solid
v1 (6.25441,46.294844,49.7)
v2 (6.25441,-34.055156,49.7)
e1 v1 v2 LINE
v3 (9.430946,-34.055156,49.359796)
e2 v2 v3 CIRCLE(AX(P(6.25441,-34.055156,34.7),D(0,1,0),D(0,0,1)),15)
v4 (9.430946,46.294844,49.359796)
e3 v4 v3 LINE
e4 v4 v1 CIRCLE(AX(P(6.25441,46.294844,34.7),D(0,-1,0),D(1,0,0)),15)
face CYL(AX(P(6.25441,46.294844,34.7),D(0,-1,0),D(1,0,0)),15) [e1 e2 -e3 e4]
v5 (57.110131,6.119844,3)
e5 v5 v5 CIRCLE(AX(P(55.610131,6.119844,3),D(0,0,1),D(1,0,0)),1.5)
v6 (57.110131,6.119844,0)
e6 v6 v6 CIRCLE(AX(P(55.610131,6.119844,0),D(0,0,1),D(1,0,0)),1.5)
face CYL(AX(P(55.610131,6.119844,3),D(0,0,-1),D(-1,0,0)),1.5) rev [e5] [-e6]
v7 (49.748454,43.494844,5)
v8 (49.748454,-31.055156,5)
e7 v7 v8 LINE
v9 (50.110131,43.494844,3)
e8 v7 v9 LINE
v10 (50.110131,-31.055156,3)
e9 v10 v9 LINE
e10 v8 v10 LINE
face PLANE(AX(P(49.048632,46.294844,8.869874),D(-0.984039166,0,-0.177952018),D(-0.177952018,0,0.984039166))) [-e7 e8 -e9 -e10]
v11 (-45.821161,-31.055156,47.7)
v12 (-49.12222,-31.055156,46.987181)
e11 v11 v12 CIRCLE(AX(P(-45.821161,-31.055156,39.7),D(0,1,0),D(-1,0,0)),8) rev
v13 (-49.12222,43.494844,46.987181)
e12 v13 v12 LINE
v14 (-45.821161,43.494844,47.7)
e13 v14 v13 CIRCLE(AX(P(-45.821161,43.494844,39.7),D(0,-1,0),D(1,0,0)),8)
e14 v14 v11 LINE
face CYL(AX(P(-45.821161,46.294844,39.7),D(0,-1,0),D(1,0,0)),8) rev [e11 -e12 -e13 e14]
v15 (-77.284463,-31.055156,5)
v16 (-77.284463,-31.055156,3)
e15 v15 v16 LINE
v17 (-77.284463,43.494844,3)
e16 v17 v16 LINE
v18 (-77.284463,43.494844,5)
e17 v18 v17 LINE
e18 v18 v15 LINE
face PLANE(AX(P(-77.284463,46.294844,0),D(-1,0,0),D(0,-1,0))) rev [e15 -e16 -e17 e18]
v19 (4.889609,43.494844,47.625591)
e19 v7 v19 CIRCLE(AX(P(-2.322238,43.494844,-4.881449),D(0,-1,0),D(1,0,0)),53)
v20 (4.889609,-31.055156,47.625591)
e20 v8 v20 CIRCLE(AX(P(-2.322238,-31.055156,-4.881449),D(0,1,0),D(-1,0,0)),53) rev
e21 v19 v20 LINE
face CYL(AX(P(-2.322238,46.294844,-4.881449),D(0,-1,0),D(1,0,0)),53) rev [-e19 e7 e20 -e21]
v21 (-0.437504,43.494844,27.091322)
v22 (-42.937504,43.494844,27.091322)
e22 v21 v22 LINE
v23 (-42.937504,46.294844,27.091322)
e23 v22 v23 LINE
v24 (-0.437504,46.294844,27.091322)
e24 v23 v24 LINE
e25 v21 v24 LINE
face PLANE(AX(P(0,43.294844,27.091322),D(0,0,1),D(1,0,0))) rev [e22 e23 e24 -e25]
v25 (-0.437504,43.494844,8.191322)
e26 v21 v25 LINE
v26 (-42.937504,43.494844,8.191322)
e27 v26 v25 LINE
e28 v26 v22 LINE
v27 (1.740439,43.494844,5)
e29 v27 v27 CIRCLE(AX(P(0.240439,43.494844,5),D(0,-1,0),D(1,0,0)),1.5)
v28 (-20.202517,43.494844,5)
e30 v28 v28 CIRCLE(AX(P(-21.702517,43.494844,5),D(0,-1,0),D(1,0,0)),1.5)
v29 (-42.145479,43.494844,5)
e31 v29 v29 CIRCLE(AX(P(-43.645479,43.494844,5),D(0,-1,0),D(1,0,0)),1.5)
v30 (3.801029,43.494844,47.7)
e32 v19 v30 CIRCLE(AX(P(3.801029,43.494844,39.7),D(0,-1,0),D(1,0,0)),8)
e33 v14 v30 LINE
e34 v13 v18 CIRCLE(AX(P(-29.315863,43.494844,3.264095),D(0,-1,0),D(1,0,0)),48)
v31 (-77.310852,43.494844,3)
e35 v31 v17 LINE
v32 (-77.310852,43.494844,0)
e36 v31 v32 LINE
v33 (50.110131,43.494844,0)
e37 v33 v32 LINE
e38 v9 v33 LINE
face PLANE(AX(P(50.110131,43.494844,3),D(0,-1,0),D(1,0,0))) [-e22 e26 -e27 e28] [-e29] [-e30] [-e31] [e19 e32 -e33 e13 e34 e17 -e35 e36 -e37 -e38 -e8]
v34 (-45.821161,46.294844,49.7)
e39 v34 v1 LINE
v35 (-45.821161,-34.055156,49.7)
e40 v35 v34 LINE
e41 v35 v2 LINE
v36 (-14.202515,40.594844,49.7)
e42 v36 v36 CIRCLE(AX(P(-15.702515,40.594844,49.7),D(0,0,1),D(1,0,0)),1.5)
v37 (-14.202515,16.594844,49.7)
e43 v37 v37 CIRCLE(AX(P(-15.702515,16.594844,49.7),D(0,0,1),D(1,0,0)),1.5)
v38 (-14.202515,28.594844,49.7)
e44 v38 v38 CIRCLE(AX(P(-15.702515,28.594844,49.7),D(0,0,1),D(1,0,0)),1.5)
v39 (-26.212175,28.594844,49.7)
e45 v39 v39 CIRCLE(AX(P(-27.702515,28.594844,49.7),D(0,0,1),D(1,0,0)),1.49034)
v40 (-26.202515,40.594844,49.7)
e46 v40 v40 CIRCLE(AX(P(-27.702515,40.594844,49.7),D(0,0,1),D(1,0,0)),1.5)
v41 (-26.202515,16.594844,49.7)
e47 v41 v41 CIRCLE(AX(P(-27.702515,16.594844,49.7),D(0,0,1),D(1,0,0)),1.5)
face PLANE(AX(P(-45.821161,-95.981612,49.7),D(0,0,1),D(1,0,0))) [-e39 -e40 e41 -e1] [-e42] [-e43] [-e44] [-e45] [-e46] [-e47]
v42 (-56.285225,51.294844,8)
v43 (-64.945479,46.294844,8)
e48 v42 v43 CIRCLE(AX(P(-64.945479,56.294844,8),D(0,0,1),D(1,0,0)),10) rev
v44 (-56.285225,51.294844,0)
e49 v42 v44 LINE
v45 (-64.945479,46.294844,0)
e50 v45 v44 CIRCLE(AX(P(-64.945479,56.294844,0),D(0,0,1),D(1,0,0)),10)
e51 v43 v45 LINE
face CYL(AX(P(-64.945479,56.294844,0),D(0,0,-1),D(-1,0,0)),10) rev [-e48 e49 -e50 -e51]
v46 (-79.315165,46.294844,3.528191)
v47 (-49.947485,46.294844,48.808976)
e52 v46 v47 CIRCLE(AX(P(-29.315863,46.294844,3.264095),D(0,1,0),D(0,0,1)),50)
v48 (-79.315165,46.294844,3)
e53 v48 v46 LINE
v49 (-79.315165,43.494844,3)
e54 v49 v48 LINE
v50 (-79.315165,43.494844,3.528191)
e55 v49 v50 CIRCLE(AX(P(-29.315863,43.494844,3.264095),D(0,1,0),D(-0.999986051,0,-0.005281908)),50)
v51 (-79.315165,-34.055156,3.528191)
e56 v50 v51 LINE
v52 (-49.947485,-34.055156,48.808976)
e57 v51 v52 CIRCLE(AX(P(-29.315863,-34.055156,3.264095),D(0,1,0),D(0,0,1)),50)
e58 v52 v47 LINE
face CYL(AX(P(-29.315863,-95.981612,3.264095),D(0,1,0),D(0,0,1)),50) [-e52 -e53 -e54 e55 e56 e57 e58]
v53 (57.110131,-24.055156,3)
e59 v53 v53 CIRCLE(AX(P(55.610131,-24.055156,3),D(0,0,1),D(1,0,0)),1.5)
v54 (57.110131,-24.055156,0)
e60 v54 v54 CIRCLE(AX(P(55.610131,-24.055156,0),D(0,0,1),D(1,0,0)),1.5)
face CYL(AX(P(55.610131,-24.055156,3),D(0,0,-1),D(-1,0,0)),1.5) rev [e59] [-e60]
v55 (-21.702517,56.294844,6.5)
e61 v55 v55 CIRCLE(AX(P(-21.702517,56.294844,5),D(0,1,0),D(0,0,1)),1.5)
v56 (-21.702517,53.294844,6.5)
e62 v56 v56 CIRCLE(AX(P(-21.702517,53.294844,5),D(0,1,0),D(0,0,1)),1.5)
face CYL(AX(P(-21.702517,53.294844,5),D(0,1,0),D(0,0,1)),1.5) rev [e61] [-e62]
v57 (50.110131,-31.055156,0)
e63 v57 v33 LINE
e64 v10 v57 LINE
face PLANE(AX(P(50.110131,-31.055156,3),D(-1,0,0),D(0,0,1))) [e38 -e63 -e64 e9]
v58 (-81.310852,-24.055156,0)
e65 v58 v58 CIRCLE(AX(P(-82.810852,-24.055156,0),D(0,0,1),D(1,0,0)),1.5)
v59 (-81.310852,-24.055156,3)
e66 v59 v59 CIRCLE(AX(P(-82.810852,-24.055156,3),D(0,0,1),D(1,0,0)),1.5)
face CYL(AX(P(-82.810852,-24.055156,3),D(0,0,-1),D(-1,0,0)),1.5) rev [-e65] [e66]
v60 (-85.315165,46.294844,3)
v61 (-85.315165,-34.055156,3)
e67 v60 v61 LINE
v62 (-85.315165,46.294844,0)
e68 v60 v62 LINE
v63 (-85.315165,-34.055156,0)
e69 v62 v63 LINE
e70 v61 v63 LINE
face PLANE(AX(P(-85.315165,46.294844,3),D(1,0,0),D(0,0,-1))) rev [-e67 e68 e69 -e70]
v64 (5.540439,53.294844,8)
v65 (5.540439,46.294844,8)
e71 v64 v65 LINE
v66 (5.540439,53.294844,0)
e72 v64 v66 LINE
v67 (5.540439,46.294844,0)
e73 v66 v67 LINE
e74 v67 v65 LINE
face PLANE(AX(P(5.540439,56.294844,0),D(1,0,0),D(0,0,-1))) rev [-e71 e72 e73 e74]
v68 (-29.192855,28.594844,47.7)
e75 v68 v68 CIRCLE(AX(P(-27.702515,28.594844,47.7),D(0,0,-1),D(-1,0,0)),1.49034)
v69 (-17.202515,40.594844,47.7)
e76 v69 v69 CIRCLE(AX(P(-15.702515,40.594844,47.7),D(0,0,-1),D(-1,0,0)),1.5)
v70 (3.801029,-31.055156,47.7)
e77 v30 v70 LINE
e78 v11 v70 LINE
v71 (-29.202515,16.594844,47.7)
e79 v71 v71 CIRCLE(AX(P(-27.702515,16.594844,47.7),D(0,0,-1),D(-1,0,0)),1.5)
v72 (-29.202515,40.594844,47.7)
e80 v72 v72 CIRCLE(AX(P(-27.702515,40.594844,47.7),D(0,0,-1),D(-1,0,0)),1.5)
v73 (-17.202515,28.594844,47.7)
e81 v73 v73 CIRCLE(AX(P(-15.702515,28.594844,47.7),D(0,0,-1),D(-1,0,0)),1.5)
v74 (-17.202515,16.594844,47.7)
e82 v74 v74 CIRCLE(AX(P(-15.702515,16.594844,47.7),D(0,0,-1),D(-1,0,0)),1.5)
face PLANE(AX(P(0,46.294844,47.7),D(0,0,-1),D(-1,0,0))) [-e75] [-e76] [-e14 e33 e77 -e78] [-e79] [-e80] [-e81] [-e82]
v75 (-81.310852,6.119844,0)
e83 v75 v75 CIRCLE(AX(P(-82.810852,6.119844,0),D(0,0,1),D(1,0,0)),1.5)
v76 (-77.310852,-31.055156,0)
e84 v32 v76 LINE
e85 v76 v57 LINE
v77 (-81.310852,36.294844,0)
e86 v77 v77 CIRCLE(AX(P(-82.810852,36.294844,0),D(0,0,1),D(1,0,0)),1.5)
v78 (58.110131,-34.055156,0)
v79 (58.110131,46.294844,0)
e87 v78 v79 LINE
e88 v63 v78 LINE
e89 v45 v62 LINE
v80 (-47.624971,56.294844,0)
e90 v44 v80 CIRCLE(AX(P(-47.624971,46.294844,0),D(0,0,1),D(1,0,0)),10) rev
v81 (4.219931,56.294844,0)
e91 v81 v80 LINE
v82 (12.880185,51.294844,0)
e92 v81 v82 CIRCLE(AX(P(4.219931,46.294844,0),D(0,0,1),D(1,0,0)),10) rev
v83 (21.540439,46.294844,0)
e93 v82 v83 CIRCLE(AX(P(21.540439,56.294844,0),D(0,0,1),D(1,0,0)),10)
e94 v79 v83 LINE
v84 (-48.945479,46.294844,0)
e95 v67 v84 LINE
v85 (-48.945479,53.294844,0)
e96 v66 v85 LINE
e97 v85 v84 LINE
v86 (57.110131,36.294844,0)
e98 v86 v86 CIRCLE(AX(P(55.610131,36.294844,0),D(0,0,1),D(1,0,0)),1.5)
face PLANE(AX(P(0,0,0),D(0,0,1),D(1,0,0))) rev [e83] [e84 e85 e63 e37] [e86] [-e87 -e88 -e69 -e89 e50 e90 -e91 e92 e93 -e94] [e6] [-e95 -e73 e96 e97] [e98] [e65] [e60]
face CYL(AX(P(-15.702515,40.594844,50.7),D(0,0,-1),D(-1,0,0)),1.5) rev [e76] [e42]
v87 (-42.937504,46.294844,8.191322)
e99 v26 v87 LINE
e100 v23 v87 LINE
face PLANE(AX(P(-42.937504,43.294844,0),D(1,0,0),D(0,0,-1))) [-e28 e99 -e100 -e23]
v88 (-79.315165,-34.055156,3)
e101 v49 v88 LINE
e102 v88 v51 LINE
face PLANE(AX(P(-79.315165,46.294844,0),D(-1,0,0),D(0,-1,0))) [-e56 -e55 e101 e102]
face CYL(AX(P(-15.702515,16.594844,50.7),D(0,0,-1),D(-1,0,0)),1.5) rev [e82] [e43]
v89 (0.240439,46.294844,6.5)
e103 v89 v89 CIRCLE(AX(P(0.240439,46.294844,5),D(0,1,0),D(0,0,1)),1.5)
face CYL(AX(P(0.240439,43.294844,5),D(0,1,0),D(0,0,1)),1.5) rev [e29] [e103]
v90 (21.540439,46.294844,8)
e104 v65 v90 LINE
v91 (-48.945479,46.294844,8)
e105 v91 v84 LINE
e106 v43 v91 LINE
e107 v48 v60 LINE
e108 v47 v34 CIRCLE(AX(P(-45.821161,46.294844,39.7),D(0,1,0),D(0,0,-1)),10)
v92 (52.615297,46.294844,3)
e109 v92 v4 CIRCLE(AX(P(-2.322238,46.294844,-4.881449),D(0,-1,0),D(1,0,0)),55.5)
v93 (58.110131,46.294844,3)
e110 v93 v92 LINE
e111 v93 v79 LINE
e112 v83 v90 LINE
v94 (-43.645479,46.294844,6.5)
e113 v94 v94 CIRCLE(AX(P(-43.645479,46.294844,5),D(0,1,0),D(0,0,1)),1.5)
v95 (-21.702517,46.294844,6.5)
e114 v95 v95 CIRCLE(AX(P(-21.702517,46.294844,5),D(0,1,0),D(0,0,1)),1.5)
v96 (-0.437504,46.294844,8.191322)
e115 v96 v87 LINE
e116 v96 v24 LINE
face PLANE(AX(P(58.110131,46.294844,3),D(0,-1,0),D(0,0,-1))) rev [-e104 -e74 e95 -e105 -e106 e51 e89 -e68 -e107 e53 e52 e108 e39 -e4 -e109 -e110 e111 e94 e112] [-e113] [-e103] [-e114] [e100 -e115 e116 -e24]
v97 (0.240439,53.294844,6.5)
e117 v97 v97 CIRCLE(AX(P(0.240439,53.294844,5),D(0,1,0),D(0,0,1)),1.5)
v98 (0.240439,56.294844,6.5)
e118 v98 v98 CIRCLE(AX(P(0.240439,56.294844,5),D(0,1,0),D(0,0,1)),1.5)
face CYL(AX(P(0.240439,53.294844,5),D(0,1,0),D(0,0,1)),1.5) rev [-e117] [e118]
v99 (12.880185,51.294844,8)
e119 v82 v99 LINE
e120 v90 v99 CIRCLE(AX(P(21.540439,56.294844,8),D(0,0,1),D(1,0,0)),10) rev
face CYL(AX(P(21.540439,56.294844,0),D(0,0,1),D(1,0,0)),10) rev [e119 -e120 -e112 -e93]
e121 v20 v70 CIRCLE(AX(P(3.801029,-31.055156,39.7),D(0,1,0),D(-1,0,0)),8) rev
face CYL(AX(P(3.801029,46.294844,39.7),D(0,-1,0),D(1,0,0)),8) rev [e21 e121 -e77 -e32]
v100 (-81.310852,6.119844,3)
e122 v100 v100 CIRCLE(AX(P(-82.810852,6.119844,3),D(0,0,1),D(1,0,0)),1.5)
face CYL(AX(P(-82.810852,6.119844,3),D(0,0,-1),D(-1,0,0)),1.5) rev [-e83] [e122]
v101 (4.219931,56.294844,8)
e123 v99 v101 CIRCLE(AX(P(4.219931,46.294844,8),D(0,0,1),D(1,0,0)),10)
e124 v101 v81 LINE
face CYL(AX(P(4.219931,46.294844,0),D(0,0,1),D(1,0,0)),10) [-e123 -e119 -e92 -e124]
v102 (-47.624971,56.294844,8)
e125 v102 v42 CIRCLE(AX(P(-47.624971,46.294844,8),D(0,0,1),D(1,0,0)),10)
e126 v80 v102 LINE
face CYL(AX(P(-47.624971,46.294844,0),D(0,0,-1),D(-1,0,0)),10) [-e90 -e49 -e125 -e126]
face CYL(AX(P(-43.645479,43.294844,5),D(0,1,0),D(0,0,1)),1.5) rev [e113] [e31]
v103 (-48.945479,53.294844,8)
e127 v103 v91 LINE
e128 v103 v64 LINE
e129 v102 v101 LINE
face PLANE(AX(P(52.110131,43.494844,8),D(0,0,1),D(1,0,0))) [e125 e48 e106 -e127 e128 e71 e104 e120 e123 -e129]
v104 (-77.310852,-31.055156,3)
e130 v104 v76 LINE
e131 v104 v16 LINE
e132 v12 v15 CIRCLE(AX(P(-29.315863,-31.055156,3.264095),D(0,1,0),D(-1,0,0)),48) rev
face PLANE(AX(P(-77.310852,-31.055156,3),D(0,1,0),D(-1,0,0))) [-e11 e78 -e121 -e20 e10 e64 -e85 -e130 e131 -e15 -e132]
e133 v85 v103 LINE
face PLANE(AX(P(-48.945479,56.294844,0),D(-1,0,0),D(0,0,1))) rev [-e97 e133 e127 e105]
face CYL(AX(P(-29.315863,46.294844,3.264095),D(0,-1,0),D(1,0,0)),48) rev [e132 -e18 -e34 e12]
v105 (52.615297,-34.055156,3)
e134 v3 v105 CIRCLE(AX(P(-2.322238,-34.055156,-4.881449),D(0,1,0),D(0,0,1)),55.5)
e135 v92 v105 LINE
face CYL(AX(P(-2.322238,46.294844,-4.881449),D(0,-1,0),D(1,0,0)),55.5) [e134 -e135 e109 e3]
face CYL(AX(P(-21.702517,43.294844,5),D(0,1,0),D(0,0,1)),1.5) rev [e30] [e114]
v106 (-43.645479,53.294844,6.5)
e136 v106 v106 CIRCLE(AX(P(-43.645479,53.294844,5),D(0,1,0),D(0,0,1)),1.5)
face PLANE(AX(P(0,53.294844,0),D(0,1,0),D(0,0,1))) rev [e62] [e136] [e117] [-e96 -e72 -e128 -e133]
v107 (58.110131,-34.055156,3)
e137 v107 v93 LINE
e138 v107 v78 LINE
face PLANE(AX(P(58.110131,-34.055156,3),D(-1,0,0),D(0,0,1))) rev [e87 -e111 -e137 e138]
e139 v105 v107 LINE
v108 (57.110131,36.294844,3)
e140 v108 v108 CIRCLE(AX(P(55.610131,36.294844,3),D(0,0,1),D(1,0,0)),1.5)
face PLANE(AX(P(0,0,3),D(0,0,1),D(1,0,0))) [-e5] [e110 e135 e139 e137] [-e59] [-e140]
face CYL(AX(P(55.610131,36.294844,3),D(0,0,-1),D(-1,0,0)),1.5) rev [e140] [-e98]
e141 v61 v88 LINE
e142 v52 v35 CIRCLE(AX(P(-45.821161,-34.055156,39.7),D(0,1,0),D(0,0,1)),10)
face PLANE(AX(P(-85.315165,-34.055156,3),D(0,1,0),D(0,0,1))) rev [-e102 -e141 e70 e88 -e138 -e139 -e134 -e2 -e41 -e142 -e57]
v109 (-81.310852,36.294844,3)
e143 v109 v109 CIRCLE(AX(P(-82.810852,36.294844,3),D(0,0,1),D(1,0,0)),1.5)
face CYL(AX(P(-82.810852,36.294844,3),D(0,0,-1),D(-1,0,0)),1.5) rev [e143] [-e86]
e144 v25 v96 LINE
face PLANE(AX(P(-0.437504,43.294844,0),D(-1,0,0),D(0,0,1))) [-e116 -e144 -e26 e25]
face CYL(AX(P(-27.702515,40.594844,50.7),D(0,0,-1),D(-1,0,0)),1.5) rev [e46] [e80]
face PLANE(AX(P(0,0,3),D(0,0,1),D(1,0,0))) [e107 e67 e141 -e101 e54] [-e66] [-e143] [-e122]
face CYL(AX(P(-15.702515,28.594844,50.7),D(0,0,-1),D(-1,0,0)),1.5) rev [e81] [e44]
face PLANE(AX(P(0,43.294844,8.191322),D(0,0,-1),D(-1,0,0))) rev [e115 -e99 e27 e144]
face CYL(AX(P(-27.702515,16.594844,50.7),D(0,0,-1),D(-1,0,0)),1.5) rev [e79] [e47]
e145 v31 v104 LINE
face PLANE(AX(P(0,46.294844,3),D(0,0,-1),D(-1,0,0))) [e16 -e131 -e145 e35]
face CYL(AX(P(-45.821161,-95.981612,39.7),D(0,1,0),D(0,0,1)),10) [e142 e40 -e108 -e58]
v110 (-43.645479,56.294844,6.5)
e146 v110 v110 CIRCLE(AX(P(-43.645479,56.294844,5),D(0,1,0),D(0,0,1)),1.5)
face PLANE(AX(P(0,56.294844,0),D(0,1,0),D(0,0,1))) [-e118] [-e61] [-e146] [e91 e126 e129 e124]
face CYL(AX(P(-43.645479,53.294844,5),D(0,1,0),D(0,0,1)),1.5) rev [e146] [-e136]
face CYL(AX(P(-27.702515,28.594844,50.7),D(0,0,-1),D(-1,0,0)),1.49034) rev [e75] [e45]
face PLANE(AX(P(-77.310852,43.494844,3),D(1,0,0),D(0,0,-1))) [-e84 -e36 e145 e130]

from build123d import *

# Parameters (mm, degrees)
SKETCH_1_W                  = 143.42529591
SKETCH_1_H                  = 80.35
SKETCH_1_R                  = 1.5
SKETCH_1_W_2                = 127.420983087
SKETCH_1_H_2                = 74.55
EXTRUDE_1_DEPTH             = 3
SKETCH_2_W                  = 131.42529591
SKETCH_2_H                  = 5
SKETCH_2_R                  = 1.5
EXTRUDE_2_DEPTH             = 2.8
SKETCH_3_R                  = 1.5
CUT_EXTRUDE_1_DEPTH         = 10
SKETCH_4_W                  = 6
SKETCH_4_H                  = 8
EXTRUDE_3_DEPTH             = 10
SKETCH_5_W                  = 54.485918212
SKETCH_5_H                  = 8
EXTRUDE_4_DEPTH             = 3
FILLET_1_R                  = 10
FILLET_2_R                  = 10
SKETCH_6_R                  = 1.5
CUT_EXTRUDE_2_DEPTH         = 3
EXTRUDE_5_DEPTH             = 2.8
SKETCH_8_W                  = 42.5
SKETCH_8_H                  = 8
SKETCH_8_H_2                = 10.9
SKETCH_8_R                  = 1.5
CUT_EXTRUDE_3_DEPTH         = 3
EXTRUDE_6_REACH             = 127.55
EXTRUDE_6_DIRECTION_2_DEPTH = 2.8
SKETCH_11_R                 = 1.5
SKETCH_11_R_2               = 1.490339558
CUT_EXTRUDE_4_DEPTH         = 3
EXTRUDE_START               = -3
EXTRUDE_7_DEPTH             = 3


with BuildPart() as part:
    # 草图1 → 凸台-拉伸1 (new body)
    with BuildSketch(Plane.XY):
        with Locations((-13.602517363, 6.11984421)):
            Rectangle(SKETCH_1_W, SKETCH_1_H)
        with Locations((55.610130592, -24.05515579)):
            Circle(SKETCH_1_R, mode=Mode.SUBTRACT)
        with Locations((55.610130592, 6.11984421)):
            Circle(SKETCH_1_R, mode=Mode.SUBTRACT)
        with Locations((55.610130592, 36.29484421)):
            Circle(SKETCH_1_R, mode=Mode.SUBTRACT)
        with Locations((-82.810852495, -24.05515579)):
            Circle(SKETCH_1_R, mode=Mode.SUBTRACT)
        with Locations((-82.810852495, 6.11984421)):
            Circle(SKETCH_1_R, mode=Mode.SUBTRACT)
        with Locations((-82.810852495, 36.29484421)):
            Circle(SKETCH_1_R, mode=Mode.SUBTRACT)
        with Locations((-13.600360952, 6.21984421)):
            Rectangle(SKETCH_1_W_2, SKETCH_1_H_2, mode=Mode.SUBTRACT)
    extrude(amount=EXTRUDE_1_DEPTH)

    # 草图2 → 凸台-拉伸2 (add)
    with BuildSketch(Plane(origin=(0, 46.29484421, 0), x_dir=(1, 0, 0), z_dir=(0, 1, 0))):
        with Locations((-13.602517363, -5.5)):
            Rectangle(SKETCH_2_W, SKETCH_2_H)
        with Locations(Location((-21.702517363, -5, 0), (0, 0, 180))):
            Circle(SKETCH_2_R, mode=Mode.SUBTRACT)
    extrude(amount=-EXTRUDE_2_DEPTH)

    # 草图3 → 切除-拉伸1 (cut)
    with BuildSketch(Plane(origin=(0, 46.29484421, 0), x_dir=(1, 0, 0), z_dir=(0, 1, 0))):
        with Locations(Location((0.240439338, -5, 0), (0, 0, 270))):
            Circle(SKETCH_3_R)
        with Locations(Location((-43.645478874, -5, 0), (0, 0, 270))):
            Circle(SKETCH_3_R)
    extrude(amount=-CUT_EXTRUDE_1_DEPTH, mode=Mode.SUBTRACT)

    # 草图4 → 凸台-拉伸3 (add)
    with BuildSketch(Plane(origin=(0, 46.29484421, 0), x_dir=(1, 0, 0), z_dir=(0, 1, 0))):
        with Locations((8.540439338, -4)):
            Rectangle(SKETCH_4_W, SKETCH_4_H)
        with Locations((-51.945478874, -4)):
            Rectangle(SKETCH_4_W, SKETCH_4_H)
    extrude(amount=EXTRUDE_3_DEPTH)

    # 草图5 → 凸台-拉伸4 (add)
    with BuildSketch(Plane(origin=(0, 56.29484421, 0), x_dir=(1, 0, 0), z_dir=(0, 1, 0))):
        with Locations((-21.702519768, -4)):
            Rectangle(SKETCH_5_W, SKETCH_5_H)
    extrude(amount=-EXTRUDE_4_DEPTH)

    # 圆角1
    fillet_1_edges = [part.edges().sort_by_distance(p)[0] for p in [
        (11.540439338, 46.29484421, 4),
        (-54.945478874, 46.29484421, 4),
    ]]
    fillet(fillet_1_edges, radius=FILLET_1_R - 0.0001)  # a hair under: the kernel refuses the full size

    # 圆角2
    fillet_2_edges = [part.edges().sort_by_distance(p)[0] for p in [
        (-54.945478874, 56.29484421, 4),
        (11.540439338, 56.29484421, 4),
    ]]
    fillet(fillet_2_edges, radius=FILLET_2_R)

    # 草图6 → 切除-拉伸2 (cut)
    with BuildSketch(Plane(origin=(0, 56.29484421, 0), x_dir=(1, 0, 0), z_dir=(0, 1, 0))):
        with Locations(Location((0.240439338, -5, 0), (0, 0, 270))):
            Circle(SKETCH_6_R)
        with Locations(Location((-21.702517363, -5, 0), (0, 0, 180))):
            Circle(SKETCH_6_R)
        with Locations(Location((-43.645478874, -5, 0), (0, 0, 270))):
            Circle(SKETCH_6_R)
    extrude(amount=-CUT_EXTRUDE_2_DEPTH, mode=Mode.SUBTRACT)

    # 草图7 → 凸台-拉伸5 (add)
    with BuildSketch(Plane(origin=(0, 46.29484421, 0), x_dir=(1, 0, 0), z_dir=(0, 1, 0))):
        with BuildLine():
            Line((52.110130592, -3), (-79.315165318, -3))
            ThreePointArc((-79.315165318, -3), (-71.408587337, -30.249323597), (-49.947485102, -48.808976146))
            ThreePointArc((-49.947485102, -48.808976146), (-47.931875984, -49.474706171), (-45.821160639, -49.7))
            Line((-45.821160639, -49.7), (3.801028521, -49.7))
            ThreePointArc((3.801028521, -49.7), (4.482979053, -49.676720076), (5.161754433, -49.606988694))
            ThreePointArc((5.161754433, -49.606988694), (36.42646247, -34.151078405), (52.110130592, -3))
        make_face()
    extrude(amount=-EXTRUDE_5_DEPTH)

    # 草图8 → 切除-拉伸3 (cut)
    with BuildSketch(Plane(origin=(0, 46.29484421, 0), x_dir=(1, 0, 0), z_dir=(0, 1, 0))):
        with BuildLine():
            Line((52.110130592, -8), (52.110130592, -3))
            ThreePointArc((52.110130592, -3), (51.686965751, -5.511139637), (51.148017839, -8))
            Line((51.148017839, -8), (52.110130592, -8))
        make_face()
        with BuildLine():
            ThreePointArc((-79.091069545, -8), (-79.253197971, -5.766605102), (-79.315165318, -3.528190833))
            Line((-79.315165318, -3.528190833), (-79.315165318, -8))
            Line((-79.315165318, -8), (-79.091069545, -8))
        make_face()
        with BuildLine():
            Line((-79.315165318, -3.528190833), (-79.315165318, -3))
            ThreePointArc((-79.315165318, -3), (-79.315862787, -3.264095416), (-79.315165318, -3.528190833))
        make_face()
        with Locations((-21.687503936, -23.091321672)):
            Rectangle(SKETCH_8_W, SKETCH_8_H)
        with Locations((-21.687503936, -13.641321672)):
            Rectangle(SKETCH_8_W, SKETCH_8_H_2)
        with Locations(Location((0.240439338, -5, 0), (0, 0, 270))):
            Circle(SKETCH_8_R)
        with Locations(Location((-43.645478874, -5, 0), (0, 0, 270))):
            Circle(SKETCH_8_R)
        with Locations(Location((-21.702517363, -5, 0), (0, 0, 270))):
            Circle(SKETCH_8_R)
    extrude(amount=-CUT_EXTRUDE_3_DEPTH, mode=Mode.SUBTRACT)

    # 凸台-拉伸6: up to this face of the body (flat: up to its plane)
    extrude_6_end = Plane(part.part.faces().sort_by_distance((-13.602517363, -34.05515579, 1.5))[0])
    # 草图9 → 凸台-拉伸6 (add, up to the picked face)
    with BuildSketch(Plane.XZ.offset(-43.49484421), mode=Mode.PRIVATE) as extrude_6_sk1:
        with BuildLine():
            ThreePointArc((-45.821160639, 49.7), (-47.931875984, 49.474706171), (-49.947485102, 48.808976146))
            ThreePointArc((-49.947485102, 48.808976146), (-71.265466668, 30.471277082), (-79.315165318, 3.528190833))
            Line((-79.315165318, 3.528190833), (-79.315165318, 3))
            Line((-79.315165318, 3), (-77.284463301, 3))
            Line((-77.284463301, 3), (-77.284463301, 5))
            ThreePointArc((-77.284463301, 5), (-69.179280492, 30.001857642), (-49.122220209, 46.987180917))
            ThreePointArc((-49.122220209, 46.987180917), (-47.509732915, 47.519764937), (-45.821160639, 47.7))
            Line((-45.821160639, 47.7), (3.801028521, 47.7))
            ThreePointArc((3.801028521, 47.7), (4.346588947, 47.681376061), (4.889609251, 47.625590956))
            ThreePointArc((4.889609251, 47.625590956), (34.185844829, 33.539377025), (49.748453895, 5))
            Line((49.748453895, 5), (50.110130592, 3))
            Line((50.110130592, 3), (52.615296987, 3))
            ThreePointArc((52.615296987, 3), (38.28835989, 32.947499211), (9.430945753, 49.359795972))
            ThreePointArc((9.430945753, 49.359795972), (7.851760578, 49.614706494), (6.254409581, 49.7))
            Line((6.254409581, 49.7), (-45.821160639, 49.7))
        make_face()
    extrude_6_tool1 = split(extrude(extrude_6_sk1.sketch, amount=EXTRUDE_6_REACH, mode=Mode.PRIVATE), bisect_by=extrude_6_end, keep=Keep.BOTH, mode=Mode.PRIVATE)
    add(extrude_6_tool1.solids().sort_by(Axis((-47.636477, 43.494844, 48.106717), (0, -1, 0)))[0])

    # 草图9 → 凸台-拉伸6 direction 2 (add)
    with BuildSketch(Plane.XZ.offset(-43.49484421)):
        with BuildLine():
            ThreePointArc((-45.821160639, 49.7), (-47.931875984, 49.474706171), (-49.947485102, 48.808976146))
            ThreePointArc((-49.947485102, 48.808976146), (-71.265466668, 30.471277082), (-79.315165318, 3.528190833))
            Line((-79.315165318, 3.528190833), (-79.315165318, 3))
            Line((-79.315165318, 3), (-77.284463301, 3))
            Line((-77.284463301, 3), (-77.284463301, 5))
            ThreePointArc((-77.284463301, 5), (-69.179280492, 30.001857642), (-49.122220209, 46.987180917))
            ThreePointArc((-49.122220209, 46.987180917), (-47.509732915, 47.519764937), (-45.821160639, 47.7))
            Line((-45.821160639, 47.7), (3.801028521, 47.7))
            ThreePointArc((3.801028521, 47.7), (4.346588947, 47.681376061), (4.889609251, 47.625590956))
            ThreePointArc((4.889609251, 47.625590956), (34.185844829, 33.539377025), (49.748453895, 5))
            Line((49.748453895, 5), (50.110130592, 3))
            Line((50.110130592, 3), (52.615296987, 3))
            ThreePointArc((52.615296987, 3), (38.28835989, 32.947499211), (9.430945753, 49.359795972))
            ThreePointArc((9.430945753, 49.359795972), (7.851760578, 49.614706494), (6.254409581, 49.7))
            Line((6.254409581, 49.7), (-45.821160639, 49.7))
        make_face()
    extrude(amount=-EXTRUDE_6_DIRECTION_2_DEPTH)

    # 草图11 → 切除-拉伸4 (cut)
    with BuildSketch(Plane(origin=(0, 0, 47.7), x_dir=(-1, 0, 0), z_dir=(0, 0, -1))):
        with Locations((15.702514958, 40.59484421)):
            Circle(SKETCH_11_R)
        with Locations((27.702514958, 40.59484421)):
            Circle(SKETCH_11_R)
        with Locations((15.702514958, 28.59484421)):
            Circle(SKETCH_11_R)
        with Locations((27.702514958, 28.59484421)):
            Circle(SKETCH_11_R_2)
        with Locations((27.702514958, 16.59484421)):
            Circle(SKETCH_11_R)
        with Locations((15.702514958, 16.59484421)):
            Circle(SKETCH_11_R)
    extrude(amount=-CUT_EXTRUDE_4_DEPTH, mode=Mode.SUBTRACT)

    # 草图12 → 凸台-拉伸7 (add)
    with BuildSketch(Plane.XZ.offset(34.05515579).offset(EXTRUDE_START)):
        with BuildLine():
            Line((50.110130592, 3), (-77.284463301, 3))
            Line((-77.284463301, 3), (-77.284463301, 5))
            ThreePointArc((-77.284463301, 5), (-69.179280492, 30.001857642), (-49.122220209, 46.987180917))
            ThreePointArc((-49.122220209, 46.987180917), (-47.509732915, 47.519764937), (-45.821160639, 47.7))
            Line((-45.821160639, 47.7), (3.801028521, 47.7))
            ThreePointArc((3.801028521, 47.7), (4.346588947, 47.681376061), (4.889609251, 47.625590956))
            ThreePointArc((4.889609251, 47.625590956), (34.185844829, 33.539377025), (49.748453895, 5))
            Line((49.748453895, 5), (50.110130592, 3))
        make_face()
        with BuildLine():
            Line((50.110130592, 3), (52.110130592, 3))
            Line((52.110130592, 3), (52.615296987, 3))
            ThreePointArc((52.615296987, 3), (38.28835989, 32.947499211), (9.430945753, 49.359795972))
            ThreePointArc((9.430945753, 49.359795972), (7.851760578, 49.614706494), (6.254409581, 49.7))
            Line((6.254409581, 49.7), (3.801028521, 49.7))
            Line((3.801028521, 49.7), (-45.821160639, 49.7))
            ThreePointArc((-45.821160639, 49.7), (-47.931875984, 49.474706171), (-49.947485102, 48.808976146))
            ThreePointArc((-49.947485102, 48.808976146), (-71.265466668, 30.471277082), (-79.315165318, 3.528190833))
            Line((-79.315165318, 3.528190833), (-79.315165318, 3))
            Line((-79.315165318, 3), (-77.284463301, 3))
            Line((-77.284463301, 3), (-77.284463301, 5))
            ThreePointArc((-77.284463301, 5), (-69.179280492, 30.001857642), (-49.122220209, 46.987180917))
            ThreePointArc((-49.122220209, 46.987180917), (-47.509732915, 47.519764937), (-45.821160639, 47.7))
            Line((-45.821160639, 47.7), (3.801028521, 47.7))
            ThreePointArc((3.801028521, 47.7), (4.346588947, 47.681376061), (4.889609251, 47.625590956))
            ThreePointArc((4.889609251, 47.625590956), (34.185844829, 33.539377025), (49.748453895, 5))
            Line((49.748453895, 5), (50.110130592, 3))
        make_face()
    extrude(amount=EXTRUDE_7_DEPTH)


solid = part.part
